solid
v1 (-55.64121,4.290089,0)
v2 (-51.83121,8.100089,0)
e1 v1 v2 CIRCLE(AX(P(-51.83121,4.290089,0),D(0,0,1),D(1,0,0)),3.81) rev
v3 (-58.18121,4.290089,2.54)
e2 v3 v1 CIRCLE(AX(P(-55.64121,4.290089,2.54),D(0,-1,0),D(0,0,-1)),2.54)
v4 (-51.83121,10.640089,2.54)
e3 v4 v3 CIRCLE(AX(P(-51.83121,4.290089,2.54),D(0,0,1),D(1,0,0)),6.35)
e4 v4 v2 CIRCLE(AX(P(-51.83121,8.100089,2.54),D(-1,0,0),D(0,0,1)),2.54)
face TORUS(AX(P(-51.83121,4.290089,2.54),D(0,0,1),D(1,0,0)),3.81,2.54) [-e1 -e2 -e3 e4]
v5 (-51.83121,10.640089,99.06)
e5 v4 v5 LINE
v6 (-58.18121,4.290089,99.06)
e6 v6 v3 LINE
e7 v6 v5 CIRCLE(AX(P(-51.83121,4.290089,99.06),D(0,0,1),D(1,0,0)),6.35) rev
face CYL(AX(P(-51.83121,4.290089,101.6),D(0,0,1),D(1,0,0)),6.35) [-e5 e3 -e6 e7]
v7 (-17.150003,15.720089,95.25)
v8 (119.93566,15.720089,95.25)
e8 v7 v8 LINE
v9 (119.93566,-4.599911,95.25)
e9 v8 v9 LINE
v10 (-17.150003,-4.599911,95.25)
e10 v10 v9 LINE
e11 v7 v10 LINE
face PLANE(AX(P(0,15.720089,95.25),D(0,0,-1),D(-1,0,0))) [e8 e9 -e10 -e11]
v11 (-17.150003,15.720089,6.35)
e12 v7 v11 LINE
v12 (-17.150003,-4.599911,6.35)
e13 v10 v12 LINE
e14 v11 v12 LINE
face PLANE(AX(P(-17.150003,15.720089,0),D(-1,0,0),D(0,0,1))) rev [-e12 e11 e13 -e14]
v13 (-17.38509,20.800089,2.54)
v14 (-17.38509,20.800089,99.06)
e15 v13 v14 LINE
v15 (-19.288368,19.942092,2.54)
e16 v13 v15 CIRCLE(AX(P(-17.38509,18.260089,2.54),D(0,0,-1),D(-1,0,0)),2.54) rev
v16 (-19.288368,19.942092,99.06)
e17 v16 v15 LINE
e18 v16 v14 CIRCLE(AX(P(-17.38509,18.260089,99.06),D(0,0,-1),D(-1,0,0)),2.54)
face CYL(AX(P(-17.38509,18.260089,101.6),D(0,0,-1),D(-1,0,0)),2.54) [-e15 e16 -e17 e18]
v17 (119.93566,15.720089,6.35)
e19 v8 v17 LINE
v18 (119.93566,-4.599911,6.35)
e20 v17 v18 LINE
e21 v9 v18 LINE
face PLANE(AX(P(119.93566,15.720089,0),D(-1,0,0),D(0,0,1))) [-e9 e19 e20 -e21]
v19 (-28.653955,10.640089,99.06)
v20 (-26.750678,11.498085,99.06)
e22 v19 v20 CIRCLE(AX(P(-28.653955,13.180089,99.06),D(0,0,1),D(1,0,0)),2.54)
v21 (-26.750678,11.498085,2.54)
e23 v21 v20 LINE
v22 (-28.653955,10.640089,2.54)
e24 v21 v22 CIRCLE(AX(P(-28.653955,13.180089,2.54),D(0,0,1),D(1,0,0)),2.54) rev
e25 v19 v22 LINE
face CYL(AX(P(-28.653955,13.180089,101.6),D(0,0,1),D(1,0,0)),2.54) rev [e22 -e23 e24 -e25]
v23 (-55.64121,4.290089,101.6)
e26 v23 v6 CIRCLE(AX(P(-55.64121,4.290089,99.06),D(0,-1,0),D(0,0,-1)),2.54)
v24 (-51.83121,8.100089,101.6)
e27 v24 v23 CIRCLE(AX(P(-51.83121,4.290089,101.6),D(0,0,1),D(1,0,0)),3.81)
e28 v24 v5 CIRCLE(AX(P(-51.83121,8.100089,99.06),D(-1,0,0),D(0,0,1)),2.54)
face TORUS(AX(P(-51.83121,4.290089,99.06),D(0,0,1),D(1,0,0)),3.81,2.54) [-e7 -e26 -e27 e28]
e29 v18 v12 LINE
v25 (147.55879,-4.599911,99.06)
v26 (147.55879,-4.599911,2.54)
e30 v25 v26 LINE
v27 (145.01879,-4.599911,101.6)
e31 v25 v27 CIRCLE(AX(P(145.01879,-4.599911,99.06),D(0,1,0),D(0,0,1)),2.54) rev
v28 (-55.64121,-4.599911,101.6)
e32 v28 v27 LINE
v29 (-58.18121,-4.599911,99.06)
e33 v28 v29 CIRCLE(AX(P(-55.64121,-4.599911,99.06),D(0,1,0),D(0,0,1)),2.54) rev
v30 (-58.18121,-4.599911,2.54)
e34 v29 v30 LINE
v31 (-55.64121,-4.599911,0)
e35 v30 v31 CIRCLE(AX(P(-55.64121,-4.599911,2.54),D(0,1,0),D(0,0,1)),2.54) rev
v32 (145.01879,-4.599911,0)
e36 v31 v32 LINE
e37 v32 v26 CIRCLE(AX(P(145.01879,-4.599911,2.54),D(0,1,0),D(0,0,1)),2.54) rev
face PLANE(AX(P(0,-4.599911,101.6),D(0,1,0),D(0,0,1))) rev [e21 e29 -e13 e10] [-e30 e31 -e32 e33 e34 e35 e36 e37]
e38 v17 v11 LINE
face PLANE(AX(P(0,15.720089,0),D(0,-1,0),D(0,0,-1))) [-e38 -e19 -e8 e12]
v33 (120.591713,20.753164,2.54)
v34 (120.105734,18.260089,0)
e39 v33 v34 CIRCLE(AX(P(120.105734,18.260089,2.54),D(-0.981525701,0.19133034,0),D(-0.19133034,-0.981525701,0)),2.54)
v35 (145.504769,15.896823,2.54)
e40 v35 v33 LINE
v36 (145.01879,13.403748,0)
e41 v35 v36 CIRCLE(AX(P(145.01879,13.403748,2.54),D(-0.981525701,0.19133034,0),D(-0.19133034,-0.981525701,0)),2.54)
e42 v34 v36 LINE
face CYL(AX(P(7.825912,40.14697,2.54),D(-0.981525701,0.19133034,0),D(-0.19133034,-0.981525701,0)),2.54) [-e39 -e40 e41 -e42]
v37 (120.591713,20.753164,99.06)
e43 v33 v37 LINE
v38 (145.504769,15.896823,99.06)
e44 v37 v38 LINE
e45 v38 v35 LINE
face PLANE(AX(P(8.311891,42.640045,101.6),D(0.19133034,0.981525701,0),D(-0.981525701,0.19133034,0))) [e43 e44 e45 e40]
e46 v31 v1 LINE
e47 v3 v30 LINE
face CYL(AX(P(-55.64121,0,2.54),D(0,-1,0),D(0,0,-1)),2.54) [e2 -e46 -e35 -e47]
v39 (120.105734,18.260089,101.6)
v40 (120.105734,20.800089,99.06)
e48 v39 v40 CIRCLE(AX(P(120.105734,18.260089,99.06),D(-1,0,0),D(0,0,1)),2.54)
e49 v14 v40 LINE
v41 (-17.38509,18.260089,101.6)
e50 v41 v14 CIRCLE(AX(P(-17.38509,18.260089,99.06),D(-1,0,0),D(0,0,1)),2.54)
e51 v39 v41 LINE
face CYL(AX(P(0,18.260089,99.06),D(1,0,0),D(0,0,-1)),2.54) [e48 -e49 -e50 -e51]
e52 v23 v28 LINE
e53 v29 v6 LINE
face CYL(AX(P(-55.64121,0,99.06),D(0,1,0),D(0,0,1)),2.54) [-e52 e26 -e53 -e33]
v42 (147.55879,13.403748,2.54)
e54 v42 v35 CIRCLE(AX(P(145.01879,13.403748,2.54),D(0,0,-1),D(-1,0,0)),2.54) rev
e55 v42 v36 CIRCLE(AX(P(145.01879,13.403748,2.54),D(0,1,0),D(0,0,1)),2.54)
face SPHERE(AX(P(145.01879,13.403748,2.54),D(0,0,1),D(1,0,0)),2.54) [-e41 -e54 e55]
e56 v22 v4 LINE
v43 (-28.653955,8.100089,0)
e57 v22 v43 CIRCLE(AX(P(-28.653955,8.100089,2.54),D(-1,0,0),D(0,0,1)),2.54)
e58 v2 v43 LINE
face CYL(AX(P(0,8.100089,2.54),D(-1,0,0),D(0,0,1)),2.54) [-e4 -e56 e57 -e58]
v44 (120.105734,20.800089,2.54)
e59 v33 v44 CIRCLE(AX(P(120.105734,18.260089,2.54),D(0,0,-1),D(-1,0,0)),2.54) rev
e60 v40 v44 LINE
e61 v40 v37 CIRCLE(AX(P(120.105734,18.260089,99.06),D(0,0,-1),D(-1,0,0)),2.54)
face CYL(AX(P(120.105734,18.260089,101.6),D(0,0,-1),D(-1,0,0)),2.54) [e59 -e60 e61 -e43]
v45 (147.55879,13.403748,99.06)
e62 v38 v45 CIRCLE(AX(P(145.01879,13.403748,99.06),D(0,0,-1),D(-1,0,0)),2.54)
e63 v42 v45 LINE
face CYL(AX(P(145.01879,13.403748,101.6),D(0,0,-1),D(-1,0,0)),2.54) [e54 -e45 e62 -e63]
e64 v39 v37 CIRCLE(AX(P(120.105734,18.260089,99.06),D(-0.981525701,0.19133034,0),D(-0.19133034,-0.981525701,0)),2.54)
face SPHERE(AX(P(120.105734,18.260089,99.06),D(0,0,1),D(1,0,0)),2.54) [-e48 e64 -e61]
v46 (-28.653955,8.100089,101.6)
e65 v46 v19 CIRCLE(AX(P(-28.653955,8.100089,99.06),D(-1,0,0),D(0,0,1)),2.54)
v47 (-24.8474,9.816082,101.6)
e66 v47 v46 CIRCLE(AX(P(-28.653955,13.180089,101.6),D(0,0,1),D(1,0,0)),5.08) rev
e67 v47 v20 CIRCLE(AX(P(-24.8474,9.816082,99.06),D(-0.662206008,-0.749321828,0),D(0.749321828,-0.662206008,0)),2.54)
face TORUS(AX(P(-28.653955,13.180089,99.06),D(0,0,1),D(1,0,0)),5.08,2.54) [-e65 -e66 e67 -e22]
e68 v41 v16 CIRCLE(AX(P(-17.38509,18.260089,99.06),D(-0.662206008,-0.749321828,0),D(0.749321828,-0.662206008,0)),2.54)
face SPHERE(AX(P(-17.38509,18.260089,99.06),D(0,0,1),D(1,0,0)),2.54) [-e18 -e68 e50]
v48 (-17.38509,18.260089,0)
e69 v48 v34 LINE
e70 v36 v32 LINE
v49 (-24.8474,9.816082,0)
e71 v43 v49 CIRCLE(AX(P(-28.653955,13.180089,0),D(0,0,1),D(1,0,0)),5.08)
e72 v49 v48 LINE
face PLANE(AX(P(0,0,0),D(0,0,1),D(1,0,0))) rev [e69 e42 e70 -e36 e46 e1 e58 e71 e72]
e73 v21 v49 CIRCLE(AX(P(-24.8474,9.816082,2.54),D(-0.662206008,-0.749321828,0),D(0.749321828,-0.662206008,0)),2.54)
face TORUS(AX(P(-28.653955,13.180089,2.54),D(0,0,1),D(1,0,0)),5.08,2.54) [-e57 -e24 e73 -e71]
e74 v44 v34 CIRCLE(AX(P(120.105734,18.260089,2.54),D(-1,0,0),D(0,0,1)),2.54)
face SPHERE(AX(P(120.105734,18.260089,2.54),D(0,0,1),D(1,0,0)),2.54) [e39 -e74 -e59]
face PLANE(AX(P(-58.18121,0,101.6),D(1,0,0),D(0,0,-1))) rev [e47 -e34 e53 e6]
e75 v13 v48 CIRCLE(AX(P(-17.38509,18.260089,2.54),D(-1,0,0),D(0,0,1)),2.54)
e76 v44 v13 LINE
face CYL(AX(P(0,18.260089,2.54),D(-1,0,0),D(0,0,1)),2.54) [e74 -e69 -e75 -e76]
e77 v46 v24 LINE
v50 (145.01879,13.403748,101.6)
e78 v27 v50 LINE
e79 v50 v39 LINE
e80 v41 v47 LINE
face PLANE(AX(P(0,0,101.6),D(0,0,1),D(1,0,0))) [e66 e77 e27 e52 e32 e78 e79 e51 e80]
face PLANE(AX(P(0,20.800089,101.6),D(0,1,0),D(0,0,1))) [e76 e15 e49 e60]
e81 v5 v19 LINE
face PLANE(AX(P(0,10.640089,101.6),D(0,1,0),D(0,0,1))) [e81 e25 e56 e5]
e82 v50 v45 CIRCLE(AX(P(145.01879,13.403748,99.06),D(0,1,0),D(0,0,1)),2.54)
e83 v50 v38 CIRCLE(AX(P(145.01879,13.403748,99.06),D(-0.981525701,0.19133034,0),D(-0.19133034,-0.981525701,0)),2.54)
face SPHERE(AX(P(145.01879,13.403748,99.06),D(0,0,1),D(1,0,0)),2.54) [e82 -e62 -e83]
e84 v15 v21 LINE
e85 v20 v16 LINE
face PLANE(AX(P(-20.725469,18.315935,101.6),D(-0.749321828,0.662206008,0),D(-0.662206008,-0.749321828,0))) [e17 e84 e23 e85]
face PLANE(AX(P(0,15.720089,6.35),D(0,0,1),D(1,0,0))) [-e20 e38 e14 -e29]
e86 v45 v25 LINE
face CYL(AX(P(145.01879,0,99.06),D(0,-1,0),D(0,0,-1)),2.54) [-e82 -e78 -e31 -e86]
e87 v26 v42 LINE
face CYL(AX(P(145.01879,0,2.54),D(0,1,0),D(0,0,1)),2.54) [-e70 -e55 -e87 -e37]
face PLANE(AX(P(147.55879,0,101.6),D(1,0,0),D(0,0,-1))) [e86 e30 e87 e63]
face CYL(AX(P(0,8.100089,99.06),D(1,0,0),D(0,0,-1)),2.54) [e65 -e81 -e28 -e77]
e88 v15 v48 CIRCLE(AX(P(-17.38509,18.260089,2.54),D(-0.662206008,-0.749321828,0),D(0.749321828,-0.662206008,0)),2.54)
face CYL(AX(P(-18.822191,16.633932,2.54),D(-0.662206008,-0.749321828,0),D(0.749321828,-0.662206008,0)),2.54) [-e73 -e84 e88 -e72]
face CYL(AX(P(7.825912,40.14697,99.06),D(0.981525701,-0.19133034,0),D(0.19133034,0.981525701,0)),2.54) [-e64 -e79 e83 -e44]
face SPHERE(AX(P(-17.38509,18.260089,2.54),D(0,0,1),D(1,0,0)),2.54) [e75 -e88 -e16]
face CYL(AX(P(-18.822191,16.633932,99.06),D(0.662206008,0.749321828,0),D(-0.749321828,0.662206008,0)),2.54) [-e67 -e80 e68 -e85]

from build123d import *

# Parameters (mm, degrees)
EXTRUDE_THIN1_DEPTH = 101.6
FILLET1_R           = 6.35
FILLET2_R           = 2.54
FILLET3_R           = 2.54
FILLET4_R           = 2.54
FILLET5_R           = 2.54
SKETCH4_W           = 137.085663299
SKETCH4_H           = 88.9
CUT_EXTRUDE1_DEPTH  = 20.32


# Read off the part's stored shape, not the designer's step: Extrude-Thin1
with BuildPart() as part:
    # Extrude-Thin1 outline → Extrude-Thin1 (new body)
    with BuildSketch(Plane.XY):
        Polygon((147.558789547, -4.59991125), (147.558789547, 15.496429633), (120.350988963, 20.80008875), (-18.530121413, 20.80008875), (-27.508924365, 10.64008875), (-58.181210453, 10.64008875), (-58.181210453, -4.59991125), align=None)
    extrude(amount=EXTRUDE_THIN1_DEPTH)

    # Fillet1
    fillet1_edges = [part.edges().sort_by_distance(p)[0] for p in [
        (-58.181210453, 10.64008875, 50.8),
    ]]
    fillet(fillet1_edges, radius=FILLET1_R)

    # Fillet2
    fillet2_edges = [part.edges().sort_by_distance(p)[0] for p in [
        (147.558789547, 15.496429633, 50.8),
    ]]
    fillet(fillet2_edges, radius=FILLET2_R)

    # Fillet3
    fillet3_edges = [part.edges().sort_by_distance(p)[0] for p in [
        (120.350988963, 20.80008875, 50.8),
        (-18.530121413, 20.80008875, 50.8),
    ]]
    fillet(fillet3_edges, radius=FILLET3_R)

    # Fillet4
    fillet4_edges = [part.edges().sort_by_distance(p)[0] for p in [
        (-27.508924365, 10.64008875, 50.8),
    ]]
    fillet(fillet4_edges, radius=FILLET4_R)

    # Fillet5
    fillet5_edges = [part.edges().sort_by_distance(p)[0] for p in [
        (-58.181210453, -0.15491125, 0),
        (-58.181210453, -0.15491125, 101.6),
        (-40.24258292, 10.64008875, 0),
        (-56.321338514, 8.780216811, 0),
        (-40.24258292, 10.64008875, 101.6),
        (-56.321338514, 8.780216811, 101.6),
        (147.558789547, 4.401918308, 0),
        (146.979144977, 15.018866002, 0),
        (147.558789547, 4.401918308, 101.6),
        (146.979144977, 15.018866002, 101.6),
        (133.048240824, 18.324993588, 0),
        (51.360321792, 20.80008875, 0),
        (120.349853607, 20.788330353, 0),
        (-18.428956215, 20.575675963, 0),
        (51.360321792, 20.80008875, 101.6),
        (133.048240824, 18.324993588, 101.6),
        (120.349853607, 20.788330353, 101.6),
        (-18.428956215, 20.575675963, 101.6),
        (-23.019522889, 15.72008875, 101.6),
        (-23.019522889, 15.72008875, 0),
        (-27.610089563, 10.864501537, 0),
        (-27.610089563, 10.864501537, 101.6),
    ]]
    fillet(fillet5_edges, radius=FILLET5_R)

    # Sketch4 → Cut-Extrude1 (cut)
    with BuildSketch(Plane(origin=(0, -4.59991125, 0), x_dir=(-1, 0, 0), z_dir=(0, -1, 0))):
        with Locations((-51.392828597, -50.8)):
            Rectangle(SKETCH4_W, SKETCH4_H)
    extrude(amount=-CUT_EXTRUDE1_DEPTH, mode=Mode.SUBTRACT)


solid = part.part
